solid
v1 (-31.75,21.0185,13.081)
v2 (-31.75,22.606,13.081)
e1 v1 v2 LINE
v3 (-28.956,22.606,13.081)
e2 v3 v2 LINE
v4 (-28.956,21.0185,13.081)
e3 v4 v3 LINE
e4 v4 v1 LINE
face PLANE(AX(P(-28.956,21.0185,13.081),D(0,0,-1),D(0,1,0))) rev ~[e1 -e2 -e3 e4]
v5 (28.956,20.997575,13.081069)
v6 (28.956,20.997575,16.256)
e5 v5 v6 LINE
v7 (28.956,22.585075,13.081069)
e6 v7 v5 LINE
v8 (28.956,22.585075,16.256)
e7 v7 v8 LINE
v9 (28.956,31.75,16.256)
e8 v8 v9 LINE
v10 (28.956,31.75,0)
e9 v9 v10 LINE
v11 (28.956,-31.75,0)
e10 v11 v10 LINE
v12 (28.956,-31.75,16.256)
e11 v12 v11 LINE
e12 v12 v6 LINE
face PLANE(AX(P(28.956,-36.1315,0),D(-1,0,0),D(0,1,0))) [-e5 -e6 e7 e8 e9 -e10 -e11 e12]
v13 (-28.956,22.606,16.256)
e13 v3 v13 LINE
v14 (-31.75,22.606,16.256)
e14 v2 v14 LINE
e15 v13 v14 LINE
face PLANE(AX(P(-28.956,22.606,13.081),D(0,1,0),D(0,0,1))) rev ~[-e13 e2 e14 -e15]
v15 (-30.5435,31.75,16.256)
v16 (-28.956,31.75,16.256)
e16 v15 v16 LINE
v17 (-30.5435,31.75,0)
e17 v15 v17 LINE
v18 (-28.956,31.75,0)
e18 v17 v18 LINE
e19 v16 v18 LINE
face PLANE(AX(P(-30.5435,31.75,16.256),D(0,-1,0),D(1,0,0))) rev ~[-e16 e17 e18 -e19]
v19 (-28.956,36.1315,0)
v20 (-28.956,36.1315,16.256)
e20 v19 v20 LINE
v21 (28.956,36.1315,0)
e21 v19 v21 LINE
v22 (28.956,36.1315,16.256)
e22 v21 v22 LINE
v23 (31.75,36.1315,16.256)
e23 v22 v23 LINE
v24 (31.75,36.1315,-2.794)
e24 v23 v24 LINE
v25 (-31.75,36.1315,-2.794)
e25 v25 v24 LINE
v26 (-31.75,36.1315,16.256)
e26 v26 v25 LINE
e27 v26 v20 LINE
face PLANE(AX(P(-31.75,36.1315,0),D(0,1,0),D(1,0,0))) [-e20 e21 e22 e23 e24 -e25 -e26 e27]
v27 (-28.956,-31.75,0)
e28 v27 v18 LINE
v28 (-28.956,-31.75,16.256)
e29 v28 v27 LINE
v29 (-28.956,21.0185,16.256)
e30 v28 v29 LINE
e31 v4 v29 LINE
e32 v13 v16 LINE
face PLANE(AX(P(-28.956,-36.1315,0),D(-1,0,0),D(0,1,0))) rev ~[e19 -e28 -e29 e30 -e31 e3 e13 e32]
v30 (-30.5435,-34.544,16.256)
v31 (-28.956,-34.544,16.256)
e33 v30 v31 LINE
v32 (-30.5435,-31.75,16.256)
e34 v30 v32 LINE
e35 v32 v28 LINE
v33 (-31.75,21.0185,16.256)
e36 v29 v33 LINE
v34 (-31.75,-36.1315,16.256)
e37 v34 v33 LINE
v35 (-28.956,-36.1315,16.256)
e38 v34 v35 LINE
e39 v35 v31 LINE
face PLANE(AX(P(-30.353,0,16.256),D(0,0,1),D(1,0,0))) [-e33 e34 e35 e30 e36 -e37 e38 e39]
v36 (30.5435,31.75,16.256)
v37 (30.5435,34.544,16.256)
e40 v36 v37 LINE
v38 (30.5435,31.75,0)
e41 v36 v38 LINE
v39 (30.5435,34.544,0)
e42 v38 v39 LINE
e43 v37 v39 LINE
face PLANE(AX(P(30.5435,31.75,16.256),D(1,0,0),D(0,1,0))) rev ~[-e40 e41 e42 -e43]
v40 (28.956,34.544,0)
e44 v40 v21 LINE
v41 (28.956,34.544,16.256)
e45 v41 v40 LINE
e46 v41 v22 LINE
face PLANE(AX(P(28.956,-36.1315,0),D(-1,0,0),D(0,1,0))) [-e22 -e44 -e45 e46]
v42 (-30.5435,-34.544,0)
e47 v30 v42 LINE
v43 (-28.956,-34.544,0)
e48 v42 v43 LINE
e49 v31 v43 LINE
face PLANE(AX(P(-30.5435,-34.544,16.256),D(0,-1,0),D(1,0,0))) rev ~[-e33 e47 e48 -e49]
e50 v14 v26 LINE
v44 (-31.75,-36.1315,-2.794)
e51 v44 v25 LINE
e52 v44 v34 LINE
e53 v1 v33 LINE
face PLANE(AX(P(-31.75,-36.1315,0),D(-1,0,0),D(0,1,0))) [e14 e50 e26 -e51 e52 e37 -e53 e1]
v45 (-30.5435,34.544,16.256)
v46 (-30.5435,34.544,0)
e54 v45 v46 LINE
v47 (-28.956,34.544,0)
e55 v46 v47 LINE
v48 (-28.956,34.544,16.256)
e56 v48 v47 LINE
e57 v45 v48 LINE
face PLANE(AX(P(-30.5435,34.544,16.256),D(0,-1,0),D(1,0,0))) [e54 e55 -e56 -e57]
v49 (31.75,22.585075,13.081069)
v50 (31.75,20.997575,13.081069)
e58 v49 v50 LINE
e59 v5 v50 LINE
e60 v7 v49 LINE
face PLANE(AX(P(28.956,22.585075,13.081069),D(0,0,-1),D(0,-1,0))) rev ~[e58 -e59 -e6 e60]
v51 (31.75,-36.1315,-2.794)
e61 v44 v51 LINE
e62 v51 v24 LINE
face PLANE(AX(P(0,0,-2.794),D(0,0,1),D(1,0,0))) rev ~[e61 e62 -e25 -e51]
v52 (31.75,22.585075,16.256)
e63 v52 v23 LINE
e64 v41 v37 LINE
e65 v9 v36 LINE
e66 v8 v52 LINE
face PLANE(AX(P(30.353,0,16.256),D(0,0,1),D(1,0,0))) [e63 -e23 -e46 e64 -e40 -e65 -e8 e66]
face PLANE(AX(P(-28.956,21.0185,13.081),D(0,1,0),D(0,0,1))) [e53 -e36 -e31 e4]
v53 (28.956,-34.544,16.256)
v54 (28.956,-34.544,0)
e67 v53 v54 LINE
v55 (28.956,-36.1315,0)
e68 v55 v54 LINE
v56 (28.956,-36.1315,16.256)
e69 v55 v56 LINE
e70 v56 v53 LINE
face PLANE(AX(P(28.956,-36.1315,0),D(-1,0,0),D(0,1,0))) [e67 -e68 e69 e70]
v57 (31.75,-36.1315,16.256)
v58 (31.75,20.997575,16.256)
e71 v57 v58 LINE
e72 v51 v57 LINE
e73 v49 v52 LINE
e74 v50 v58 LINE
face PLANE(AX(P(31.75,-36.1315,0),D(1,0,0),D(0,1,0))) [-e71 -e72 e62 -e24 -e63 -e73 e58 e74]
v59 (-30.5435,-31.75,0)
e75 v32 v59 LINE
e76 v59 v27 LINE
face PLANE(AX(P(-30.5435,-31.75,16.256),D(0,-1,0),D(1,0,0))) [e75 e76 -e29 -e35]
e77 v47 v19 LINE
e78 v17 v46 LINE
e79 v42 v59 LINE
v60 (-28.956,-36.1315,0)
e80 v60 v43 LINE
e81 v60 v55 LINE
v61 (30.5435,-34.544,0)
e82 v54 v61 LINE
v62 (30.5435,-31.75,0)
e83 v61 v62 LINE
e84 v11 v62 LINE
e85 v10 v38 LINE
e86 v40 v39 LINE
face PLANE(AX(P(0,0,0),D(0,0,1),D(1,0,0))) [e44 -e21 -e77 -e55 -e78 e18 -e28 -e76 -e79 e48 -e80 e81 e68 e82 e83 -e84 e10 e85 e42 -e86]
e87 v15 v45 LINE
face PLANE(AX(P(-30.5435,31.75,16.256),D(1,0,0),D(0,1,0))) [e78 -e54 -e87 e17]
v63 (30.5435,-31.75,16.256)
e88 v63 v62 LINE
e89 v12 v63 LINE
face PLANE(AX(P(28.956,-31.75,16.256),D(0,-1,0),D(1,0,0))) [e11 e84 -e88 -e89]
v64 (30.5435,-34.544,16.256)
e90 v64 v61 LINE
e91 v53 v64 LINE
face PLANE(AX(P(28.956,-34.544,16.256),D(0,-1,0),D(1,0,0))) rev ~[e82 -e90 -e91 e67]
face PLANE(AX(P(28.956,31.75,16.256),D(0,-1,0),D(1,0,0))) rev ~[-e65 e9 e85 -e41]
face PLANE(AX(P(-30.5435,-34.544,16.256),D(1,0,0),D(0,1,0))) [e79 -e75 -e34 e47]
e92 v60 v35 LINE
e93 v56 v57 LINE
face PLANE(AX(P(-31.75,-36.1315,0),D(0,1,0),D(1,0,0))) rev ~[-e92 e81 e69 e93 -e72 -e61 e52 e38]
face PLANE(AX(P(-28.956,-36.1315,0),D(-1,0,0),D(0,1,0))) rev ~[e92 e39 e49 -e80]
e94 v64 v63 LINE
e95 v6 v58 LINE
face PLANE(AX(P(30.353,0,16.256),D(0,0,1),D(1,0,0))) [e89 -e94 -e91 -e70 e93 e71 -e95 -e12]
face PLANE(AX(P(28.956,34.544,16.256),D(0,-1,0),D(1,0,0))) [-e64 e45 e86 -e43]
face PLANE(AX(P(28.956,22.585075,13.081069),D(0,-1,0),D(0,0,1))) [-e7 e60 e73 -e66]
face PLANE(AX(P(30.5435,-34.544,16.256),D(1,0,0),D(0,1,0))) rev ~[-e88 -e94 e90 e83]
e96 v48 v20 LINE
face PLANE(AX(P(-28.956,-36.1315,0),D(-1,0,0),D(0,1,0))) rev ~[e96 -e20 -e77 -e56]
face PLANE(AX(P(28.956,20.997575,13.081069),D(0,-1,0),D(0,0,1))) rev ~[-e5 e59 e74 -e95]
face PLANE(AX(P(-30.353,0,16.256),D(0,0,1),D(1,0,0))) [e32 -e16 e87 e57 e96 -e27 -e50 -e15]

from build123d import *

# Parameters (mm, degrees)
F0_W      = 63.5
F0_H      = 72.263
F1_DEPTH  = 2.794
F2_W      = 2.794
F2_H      = 72.263
F3_DEPTH  = 16.256
F4_W      = 1.5875
F4_H      = 2.794
F5_DEPTH  = 16.256
F6_W      = 1.5875
F6_H      = 2.794
F7_DEPTH  = 16.256
F8_W      = 1.5875
F8_H      = 3.175
F9_DEPTH  = 2.794
F10_W     = 1.5875
F10_H     = 3.174931046
F11_DEPTH = 2.794


# Not quite as in the source:
# - a feature names something its author has since deleted; it is built from what else it names


with BuildPart() as f1:
    # F0 (on Top) → F1 (new body)
    with BuildSketch(Plane.XY):
        Rectangle(F0_W, F0_H)
    extrude(amount=-F1_DEPTH)

    # F2 (on face) → F3 (join)
    with BuildSketch(Plane.XY):
        with Locations((-30.353, 0)):
            Rectangle(F2_W, F2_H)
        with Locations((30.353, 0)):
            Rectangle(F2_W, F2_H)
    extrude(amount=F3_DEPTH)

    # F4 (on face) → F5 (cut, through all)
    with BuildSketch(Plane.XY.offset(16.256)):
        with Locations((-29.74975, 33.147)):
            Rectangle(F4_W, F4_H)
        with Locations((-29.74975, -33.147)):
            Rectangle(F4_W, F4_H)
    extrude(amount=-F5_DEPTH, mode=Mode.SUBTRACT)

    # F6 (on face) → F7 (cut, through all)
    with BuildSketch(Plane.XY.offset(16.256)):
        with Locations((29.74975, 33.147)):
            Rectangle(F6_W, F6_H)
        with Locations((29.74975, -33.147)):
            Rectangle(F6_W, F6_H)
    extrude(amount=-F7_DEPTH, mode=Mode.SUBTRACT)

    # F8 (on face) → F9 (cut, through all)
    with BuildSketch(Plane.YZ.offset(-28.956)):
        with Locations((21.81225, 14.6685)):
            Rectangle(F8_W, F8_H)
    extrude(amount=-F9_DEPTH, mode=Mode.SUBTRACT)

    # F10 (on face) → F11 (cut, through all)
    with BuildSketch(Plane(origin=(28.956, 0, 0), x_dir=(0, -1, 0), z_dir=(-1, 0, 0))):
        with Locations((-21.7913250594, 14.668534477)):
            Rectangle(F10_W, F10_H)
    extrude(amount=-F11_DEPTH, mode=Mode.SUBTRACT)


solid = f1.part
